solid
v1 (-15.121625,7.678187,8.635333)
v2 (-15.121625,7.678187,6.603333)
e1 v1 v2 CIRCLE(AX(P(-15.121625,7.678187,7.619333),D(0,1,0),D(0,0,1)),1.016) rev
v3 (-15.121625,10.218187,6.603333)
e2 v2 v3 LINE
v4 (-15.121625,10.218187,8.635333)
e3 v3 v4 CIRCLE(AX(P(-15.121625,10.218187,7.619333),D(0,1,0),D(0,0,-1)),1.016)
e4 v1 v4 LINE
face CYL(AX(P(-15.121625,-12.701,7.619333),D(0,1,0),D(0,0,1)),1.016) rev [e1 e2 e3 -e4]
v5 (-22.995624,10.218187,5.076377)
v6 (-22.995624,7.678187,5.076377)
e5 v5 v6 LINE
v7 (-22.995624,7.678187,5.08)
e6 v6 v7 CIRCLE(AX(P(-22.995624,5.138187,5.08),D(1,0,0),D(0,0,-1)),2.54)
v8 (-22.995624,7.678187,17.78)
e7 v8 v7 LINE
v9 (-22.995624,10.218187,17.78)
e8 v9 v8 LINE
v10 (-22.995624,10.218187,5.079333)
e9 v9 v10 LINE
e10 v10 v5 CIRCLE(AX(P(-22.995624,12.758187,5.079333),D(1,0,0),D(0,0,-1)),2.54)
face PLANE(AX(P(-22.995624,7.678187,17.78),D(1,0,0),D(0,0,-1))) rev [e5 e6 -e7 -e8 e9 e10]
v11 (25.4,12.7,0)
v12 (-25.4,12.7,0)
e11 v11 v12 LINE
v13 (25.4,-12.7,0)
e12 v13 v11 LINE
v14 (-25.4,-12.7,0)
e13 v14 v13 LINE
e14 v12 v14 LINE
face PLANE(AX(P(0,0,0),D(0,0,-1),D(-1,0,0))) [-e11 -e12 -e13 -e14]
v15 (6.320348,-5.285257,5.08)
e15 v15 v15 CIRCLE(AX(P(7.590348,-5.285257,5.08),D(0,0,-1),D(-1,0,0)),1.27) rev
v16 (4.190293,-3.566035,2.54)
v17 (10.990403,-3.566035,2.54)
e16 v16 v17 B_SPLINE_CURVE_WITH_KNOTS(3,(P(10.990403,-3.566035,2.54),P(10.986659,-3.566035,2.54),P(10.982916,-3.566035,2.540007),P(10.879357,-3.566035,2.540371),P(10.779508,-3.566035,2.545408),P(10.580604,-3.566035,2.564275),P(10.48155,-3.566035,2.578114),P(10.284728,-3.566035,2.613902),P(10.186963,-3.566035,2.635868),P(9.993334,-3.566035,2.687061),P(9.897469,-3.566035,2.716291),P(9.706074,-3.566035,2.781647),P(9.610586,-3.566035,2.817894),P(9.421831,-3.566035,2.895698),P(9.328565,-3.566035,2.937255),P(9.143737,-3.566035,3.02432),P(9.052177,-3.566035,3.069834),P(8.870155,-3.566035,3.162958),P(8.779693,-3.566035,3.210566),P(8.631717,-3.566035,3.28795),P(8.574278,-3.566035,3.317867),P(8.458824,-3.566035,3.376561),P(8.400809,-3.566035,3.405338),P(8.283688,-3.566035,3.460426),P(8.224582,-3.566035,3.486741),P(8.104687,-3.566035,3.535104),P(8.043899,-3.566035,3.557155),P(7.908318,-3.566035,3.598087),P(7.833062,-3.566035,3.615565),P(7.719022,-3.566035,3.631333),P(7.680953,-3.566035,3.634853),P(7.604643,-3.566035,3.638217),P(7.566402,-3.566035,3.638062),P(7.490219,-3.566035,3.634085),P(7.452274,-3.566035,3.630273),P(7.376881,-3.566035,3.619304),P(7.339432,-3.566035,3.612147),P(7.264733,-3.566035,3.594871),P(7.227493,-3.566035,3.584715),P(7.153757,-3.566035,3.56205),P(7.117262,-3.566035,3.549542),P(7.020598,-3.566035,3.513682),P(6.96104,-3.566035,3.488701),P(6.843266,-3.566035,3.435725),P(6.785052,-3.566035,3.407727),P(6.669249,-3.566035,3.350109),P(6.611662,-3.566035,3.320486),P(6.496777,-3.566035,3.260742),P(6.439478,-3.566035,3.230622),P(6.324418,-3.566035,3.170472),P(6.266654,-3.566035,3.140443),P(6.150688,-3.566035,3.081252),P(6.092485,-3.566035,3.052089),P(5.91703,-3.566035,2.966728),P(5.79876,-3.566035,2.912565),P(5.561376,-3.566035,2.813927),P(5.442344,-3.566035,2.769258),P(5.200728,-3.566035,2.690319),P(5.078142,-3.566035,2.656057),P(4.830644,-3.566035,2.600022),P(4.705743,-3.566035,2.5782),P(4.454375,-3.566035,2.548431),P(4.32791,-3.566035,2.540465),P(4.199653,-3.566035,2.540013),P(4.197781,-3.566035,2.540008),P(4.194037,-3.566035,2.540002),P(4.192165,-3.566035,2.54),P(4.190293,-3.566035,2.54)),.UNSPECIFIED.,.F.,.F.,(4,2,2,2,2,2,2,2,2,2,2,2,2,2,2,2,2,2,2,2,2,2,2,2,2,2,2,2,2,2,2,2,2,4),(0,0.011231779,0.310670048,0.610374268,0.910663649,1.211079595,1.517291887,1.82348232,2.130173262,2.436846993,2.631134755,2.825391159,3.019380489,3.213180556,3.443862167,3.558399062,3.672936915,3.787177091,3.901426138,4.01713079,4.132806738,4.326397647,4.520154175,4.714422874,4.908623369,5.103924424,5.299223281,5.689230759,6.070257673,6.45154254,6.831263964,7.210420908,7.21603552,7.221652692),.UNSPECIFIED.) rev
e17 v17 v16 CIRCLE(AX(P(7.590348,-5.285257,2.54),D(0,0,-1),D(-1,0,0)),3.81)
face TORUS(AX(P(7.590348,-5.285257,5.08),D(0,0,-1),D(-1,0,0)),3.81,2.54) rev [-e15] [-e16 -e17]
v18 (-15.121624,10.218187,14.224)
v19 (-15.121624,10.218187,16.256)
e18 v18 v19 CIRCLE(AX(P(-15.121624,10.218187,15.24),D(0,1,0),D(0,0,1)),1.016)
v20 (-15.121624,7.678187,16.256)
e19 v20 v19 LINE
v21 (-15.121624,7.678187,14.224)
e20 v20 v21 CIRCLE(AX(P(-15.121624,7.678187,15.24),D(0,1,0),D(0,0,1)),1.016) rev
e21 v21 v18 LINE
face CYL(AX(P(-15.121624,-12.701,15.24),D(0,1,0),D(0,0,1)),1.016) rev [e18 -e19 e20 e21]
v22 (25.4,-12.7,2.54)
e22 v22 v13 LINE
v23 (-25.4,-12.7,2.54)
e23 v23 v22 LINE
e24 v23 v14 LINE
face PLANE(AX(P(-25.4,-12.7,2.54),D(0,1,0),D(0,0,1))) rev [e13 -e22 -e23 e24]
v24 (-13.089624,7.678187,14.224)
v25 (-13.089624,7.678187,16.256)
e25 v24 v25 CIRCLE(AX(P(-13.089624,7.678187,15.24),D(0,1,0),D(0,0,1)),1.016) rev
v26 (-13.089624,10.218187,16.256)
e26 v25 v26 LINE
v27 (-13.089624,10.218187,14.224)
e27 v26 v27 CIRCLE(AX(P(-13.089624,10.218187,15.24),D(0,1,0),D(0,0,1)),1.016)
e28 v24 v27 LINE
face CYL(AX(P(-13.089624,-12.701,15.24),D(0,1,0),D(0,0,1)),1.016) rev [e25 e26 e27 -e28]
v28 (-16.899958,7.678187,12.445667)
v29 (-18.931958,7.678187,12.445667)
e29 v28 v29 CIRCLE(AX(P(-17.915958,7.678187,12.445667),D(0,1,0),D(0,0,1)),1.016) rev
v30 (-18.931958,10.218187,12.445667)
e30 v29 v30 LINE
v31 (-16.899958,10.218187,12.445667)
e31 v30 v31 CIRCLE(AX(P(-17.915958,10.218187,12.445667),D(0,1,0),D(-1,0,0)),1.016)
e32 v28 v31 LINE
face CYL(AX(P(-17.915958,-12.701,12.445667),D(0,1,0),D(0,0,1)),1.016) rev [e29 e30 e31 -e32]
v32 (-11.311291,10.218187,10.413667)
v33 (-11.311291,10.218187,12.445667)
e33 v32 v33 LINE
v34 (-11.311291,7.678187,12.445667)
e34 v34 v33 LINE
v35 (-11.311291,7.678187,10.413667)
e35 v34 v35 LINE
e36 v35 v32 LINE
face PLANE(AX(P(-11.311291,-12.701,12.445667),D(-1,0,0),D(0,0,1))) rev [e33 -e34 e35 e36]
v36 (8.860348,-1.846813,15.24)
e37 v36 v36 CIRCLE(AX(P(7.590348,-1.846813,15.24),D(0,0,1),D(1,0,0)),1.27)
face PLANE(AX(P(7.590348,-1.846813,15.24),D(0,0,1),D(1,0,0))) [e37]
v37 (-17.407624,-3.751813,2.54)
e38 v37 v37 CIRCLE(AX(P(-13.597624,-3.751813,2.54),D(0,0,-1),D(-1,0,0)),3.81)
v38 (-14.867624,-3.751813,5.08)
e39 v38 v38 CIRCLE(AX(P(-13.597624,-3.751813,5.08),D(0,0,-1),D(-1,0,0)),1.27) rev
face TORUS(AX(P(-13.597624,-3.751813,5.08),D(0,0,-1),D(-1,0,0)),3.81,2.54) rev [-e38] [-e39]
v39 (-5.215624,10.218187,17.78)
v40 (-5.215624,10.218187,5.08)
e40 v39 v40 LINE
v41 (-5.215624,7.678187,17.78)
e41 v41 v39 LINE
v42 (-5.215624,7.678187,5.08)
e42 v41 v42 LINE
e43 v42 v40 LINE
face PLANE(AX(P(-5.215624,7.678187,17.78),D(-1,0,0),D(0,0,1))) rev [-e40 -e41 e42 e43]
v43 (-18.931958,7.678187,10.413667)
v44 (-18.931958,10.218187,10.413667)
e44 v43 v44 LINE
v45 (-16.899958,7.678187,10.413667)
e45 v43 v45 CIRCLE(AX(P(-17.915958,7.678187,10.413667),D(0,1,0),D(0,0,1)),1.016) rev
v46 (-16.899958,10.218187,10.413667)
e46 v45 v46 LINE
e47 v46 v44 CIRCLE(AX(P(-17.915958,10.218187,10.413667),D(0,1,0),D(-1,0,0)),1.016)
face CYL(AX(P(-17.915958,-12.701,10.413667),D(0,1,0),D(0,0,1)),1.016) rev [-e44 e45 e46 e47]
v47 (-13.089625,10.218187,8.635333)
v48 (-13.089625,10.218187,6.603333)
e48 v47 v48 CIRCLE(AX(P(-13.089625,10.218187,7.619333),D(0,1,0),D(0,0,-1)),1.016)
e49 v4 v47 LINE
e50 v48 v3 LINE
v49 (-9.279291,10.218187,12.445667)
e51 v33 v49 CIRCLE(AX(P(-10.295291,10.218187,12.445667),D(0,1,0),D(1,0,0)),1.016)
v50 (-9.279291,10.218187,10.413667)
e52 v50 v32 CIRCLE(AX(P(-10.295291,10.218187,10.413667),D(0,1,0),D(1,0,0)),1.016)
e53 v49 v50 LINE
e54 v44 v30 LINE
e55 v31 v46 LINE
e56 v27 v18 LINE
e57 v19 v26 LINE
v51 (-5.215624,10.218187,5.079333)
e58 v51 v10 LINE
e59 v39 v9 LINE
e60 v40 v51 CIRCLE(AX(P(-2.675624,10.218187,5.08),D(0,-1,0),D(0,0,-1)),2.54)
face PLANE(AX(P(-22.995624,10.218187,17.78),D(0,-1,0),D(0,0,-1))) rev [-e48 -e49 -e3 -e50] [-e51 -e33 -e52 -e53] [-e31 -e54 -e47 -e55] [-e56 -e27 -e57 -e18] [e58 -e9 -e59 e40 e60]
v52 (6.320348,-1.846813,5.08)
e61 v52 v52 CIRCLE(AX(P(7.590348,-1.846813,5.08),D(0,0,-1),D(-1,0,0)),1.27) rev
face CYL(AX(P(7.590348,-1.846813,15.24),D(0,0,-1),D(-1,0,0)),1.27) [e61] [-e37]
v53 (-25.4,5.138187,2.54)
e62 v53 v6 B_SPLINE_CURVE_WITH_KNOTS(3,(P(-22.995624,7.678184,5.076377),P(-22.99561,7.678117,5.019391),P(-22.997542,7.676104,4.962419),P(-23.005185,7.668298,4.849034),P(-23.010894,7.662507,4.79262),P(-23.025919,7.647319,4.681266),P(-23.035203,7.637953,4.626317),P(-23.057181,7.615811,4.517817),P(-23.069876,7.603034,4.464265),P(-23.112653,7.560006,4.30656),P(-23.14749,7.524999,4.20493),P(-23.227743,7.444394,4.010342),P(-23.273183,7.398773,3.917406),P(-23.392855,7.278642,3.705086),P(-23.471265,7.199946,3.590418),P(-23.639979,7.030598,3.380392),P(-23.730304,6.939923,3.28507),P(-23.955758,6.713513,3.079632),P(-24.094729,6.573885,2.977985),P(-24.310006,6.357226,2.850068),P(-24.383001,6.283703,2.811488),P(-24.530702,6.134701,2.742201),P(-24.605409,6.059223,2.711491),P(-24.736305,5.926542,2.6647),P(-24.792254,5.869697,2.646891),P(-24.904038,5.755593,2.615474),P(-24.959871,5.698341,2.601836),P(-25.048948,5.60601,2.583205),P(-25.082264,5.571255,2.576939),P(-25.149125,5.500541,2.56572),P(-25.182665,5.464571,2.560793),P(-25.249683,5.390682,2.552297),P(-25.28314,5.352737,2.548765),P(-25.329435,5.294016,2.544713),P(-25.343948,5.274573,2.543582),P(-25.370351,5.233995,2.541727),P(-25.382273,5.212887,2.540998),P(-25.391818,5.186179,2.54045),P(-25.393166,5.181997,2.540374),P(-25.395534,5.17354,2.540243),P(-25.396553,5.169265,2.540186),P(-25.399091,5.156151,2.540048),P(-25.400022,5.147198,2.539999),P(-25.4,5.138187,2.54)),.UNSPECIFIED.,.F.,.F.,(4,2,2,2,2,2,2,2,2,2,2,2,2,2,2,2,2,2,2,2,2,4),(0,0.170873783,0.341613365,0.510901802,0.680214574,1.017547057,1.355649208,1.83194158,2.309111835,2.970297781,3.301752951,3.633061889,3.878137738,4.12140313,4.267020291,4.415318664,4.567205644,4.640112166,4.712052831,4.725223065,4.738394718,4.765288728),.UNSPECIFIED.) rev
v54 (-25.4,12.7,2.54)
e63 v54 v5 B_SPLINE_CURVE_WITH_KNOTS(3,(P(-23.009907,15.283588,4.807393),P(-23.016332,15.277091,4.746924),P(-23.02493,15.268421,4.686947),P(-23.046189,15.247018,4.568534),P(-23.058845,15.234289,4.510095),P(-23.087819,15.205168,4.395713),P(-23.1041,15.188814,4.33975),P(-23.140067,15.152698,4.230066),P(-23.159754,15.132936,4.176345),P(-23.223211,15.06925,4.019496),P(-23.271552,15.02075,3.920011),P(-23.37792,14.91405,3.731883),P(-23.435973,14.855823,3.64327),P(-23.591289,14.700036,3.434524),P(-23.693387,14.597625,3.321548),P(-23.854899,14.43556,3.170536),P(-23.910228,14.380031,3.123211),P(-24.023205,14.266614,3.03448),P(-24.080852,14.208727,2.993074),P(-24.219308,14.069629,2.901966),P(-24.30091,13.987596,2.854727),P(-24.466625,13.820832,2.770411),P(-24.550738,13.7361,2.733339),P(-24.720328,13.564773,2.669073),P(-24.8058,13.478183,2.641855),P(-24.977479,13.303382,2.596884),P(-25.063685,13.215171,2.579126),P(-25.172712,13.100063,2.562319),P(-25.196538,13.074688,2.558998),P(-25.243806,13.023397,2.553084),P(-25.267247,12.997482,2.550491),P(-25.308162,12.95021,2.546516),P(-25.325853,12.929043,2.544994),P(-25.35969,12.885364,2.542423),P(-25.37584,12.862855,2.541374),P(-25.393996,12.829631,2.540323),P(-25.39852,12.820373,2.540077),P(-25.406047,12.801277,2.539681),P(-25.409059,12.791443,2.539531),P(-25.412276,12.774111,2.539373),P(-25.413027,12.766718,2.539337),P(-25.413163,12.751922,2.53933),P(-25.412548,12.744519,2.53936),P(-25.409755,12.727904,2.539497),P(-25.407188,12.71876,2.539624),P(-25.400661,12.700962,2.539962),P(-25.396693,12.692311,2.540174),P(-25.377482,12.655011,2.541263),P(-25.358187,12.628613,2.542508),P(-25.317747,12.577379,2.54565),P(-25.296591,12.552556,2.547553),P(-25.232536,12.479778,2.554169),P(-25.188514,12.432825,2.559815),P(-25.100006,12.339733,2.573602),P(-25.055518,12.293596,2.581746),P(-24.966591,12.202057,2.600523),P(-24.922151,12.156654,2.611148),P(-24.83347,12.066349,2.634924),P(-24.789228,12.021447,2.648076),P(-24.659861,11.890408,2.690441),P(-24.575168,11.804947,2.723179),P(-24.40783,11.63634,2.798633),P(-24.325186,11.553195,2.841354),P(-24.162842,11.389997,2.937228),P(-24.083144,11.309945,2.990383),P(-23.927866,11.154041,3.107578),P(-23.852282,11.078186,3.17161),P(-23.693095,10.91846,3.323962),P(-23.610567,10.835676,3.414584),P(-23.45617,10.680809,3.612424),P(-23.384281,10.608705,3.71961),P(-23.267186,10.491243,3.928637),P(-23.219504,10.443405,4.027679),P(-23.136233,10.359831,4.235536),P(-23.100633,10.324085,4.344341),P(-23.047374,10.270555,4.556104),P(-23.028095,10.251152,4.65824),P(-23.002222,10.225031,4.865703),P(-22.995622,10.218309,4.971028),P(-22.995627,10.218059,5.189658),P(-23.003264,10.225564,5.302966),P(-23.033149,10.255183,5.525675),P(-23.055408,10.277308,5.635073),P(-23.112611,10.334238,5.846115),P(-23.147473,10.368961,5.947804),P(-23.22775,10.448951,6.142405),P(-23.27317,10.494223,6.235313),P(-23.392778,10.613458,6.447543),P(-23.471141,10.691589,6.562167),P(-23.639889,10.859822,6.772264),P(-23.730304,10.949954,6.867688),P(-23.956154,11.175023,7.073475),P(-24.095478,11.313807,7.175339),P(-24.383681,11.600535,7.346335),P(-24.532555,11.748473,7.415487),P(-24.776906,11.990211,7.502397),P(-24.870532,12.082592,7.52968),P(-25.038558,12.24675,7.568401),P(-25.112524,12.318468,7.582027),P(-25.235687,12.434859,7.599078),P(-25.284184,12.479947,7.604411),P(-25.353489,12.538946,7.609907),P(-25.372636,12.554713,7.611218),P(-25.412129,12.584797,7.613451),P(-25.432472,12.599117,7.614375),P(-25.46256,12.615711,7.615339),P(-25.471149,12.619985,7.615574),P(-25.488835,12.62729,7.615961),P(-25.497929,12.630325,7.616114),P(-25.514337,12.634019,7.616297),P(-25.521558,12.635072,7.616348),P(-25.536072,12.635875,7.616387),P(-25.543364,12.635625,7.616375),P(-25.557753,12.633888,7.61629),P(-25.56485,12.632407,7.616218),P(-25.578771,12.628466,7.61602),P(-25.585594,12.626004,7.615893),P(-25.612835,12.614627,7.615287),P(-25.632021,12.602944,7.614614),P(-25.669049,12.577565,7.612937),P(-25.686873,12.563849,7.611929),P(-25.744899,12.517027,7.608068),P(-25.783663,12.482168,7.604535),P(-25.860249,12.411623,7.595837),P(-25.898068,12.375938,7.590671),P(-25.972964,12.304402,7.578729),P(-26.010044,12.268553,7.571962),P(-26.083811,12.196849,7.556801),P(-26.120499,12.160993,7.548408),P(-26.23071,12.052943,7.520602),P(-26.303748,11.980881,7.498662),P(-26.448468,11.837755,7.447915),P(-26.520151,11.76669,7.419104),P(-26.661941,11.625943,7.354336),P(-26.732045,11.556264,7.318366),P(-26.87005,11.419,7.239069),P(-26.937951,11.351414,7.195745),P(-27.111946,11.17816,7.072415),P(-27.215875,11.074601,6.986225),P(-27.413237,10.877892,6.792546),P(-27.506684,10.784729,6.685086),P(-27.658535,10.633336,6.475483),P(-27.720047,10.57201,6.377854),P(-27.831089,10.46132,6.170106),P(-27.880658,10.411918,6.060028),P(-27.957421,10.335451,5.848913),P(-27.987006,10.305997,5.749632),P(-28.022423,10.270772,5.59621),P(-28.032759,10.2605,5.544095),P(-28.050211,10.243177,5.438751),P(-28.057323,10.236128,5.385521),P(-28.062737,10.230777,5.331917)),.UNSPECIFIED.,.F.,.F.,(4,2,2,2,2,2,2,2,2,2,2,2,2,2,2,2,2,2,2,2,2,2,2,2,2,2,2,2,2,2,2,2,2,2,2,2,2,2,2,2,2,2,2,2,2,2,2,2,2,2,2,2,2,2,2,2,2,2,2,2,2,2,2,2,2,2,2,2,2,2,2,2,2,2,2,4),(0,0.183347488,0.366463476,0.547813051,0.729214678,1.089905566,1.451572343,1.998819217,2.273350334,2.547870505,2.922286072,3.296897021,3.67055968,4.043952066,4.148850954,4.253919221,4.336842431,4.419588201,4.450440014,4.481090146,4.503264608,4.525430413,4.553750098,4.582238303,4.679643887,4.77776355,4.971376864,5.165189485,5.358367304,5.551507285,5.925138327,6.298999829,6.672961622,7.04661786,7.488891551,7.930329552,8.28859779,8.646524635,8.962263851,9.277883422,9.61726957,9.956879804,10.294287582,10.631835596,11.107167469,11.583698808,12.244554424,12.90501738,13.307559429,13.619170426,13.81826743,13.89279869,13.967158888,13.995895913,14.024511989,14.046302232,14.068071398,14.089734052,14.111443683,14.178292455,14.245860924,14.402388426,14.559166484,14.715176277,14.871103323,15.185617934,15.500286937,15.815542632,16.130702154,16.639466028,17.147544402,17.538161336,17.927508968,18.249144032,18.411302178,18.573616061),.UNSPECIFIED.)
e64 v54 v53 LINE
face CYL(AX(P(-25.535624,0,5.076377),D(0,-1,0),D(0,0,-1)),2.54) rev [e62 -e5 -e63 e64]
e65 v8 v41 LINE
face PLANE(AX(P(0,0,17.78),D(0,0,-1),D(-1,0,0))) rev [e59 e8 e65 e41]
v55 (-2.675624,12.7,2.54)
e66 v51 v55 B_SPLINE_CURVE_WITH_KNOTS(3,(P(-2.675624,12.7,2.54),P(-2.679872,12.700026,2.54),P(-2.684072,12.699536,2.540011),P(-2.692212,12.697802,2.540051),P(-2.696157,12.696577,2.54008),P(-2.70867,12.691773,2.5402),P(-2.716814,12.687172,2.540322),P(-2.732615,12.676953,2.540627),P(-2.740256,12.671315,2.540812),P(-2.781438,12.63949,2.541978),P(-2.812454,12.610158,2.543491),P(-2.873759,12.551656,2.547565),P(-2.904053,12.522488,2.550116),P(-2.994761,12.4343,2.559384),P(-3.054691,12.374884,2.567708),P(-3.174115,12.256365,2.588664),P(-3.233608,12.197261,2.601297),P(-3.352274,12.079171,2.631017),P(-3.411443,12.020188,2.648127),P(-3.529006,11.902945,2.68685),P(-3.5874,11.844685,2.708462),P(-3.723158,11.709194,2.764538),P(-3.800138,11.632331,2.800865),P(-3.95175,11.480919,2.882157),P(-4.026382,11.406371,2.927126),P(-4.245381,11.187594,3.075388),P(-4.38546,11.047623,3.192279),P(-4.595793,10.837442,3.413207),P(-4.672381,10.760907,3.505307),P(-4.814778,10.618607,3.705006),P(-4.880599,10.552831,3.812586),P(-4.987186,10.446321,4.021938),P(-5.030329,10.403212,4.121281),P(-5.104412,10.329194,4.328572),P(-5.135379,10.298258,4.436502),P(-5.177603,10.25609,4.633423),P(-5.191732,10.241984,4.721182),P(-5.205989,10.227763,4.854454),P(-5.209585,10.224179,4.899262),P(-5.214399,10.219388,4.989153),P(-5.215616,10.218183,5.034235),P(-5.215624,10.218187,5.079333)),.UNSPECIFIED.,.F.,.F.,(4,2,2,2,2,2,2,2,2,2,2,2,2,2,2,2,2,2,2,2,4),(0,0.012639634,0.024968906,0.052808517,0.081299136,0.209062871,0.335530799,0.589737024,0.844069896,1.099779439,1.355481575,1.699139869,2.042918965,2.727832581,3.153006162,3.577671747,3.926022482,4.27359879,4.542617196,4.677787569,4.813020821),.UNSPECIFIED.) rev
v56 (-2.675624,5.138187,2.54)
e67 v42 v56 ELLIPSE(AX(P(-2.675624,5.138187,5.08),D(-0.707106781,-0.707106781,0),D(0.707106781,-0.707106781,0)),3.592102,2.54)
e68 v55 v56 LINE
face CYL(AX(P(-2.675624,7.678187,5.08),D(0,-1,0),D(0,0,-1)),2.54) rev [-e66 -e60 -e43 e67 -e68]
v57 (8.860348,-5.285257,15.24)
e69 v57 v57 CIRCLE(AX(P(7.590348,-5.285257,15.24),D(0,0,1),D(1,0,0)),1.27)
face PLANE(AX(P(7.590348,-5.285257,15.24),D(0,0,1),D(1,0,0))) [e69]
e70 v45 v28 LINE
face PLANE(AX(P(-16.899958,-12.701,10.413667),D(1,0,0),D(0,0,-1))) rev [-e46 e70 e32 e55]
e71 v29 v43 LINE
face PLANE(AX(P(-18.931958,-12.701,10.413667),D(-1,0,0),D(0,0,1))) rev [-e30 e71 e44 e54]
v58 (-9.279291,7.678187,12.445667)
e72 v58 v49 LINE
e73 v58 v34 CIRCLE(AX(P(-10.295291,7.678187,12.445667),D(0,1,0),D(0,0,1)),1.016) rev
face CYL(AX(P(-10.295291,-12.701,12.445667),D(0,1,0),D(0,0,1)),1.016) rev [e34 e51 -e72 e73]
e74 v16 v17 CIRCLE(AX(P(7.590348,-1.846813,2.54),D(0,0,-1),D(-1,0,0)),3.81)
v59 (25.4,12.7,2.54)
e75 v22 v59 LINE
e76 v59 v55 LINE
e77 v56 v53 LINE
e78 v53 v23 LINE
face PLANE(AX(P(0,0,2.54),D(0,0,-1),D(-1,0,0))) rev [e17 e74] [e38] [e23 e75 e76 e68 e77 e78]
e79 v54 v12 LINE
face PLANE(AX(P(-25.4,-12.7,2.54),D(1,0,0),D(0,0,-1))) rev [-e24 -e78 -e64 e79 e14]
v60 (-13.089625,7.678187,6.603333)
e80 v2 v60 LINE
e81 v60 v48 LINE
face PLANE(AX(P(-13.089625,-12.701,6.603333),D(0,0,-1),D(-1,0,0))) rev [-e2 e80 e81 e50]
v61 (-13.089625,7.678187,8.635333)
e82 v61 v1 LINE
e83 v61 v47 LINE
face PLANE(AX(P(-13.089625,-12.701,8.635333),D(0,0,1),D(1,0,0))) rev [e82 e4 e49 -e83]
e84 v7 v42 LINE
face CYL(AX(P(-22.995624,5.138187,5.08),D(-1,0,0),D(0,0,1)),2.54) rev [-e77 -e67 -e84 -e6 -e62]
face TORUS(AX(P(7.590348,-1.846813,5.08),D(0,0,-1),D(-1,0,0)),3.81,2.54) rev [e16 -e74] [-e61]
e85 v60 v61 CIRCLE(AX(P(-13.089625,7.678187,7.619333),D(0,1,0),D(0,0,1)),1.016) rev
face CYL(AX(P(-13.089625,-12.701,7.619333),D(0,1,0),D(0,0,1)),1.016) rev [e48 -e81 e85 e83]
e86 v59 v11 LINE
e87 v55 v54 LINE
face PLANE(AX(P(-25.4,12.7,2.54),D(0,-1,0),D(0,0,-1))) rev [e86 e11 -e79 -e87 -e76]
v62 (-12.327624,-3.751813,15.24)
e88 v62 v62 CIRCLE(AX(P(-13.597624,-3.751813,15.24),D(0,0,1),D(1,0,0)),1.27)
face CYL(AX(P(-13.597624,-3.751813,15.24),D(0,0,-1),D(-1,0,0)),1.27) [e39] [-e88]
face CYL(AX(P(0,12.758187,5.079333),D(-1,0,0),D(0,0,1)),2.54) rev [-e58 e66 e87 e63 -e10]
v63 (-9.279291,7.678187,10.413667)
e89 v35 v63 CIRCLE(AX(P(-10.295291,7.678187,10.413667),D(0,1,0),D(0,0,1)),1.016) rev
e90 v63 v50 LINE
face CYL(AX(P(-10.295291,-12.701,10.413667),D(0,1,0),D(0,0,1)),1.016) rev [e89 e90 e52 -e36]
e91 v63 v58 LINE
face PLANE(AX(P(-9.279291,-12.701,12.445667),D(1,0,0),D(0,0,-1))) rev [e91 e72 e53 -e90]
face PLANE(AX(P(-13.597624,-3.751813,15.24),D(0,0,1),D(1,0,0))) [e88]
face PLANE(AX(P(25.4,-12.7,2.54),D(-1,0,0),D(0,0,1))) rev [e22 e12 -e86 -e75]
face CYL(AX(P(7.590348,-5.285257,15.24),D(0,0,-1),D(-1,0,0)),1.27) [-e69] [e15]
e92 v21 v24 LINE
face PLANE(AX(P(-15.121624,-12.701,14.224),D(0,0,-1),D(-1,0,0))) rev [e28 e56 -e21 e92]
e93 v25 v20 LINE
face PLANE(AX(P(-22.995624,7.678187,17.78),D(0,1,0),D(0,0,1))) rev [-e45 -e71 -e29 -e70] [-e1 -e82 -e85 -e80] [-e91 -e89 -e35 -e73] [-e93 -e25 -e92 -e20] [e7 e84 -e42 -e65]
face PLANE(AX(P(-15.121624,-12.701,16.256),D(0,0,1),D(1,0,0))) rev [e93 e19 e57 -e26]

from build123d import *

# Parameters (mm, degrees)
SKETCH1_W                 = 50.8
SKETCH1_H                 = 25.4
BASE_DEPTH                = 2.54
SKETCH2_R                 = 1.27
GUIDEPOSTS_DEPTH          = 12.7
SKETCH3_W                 = 17.78
SKETCH3_H                 = 2.54
BUTTON_HOLDER_DEPTH       = 15.24
ROUND_ON_BUTTON_HOLDER_R  = 2.54
ONE_BUTTON_LEG_HOLE_REACH = 40.556
BUTTON_LEG_HOLES_COUNT    = 4


with BuildPart() as part:
    # Sketch1 → base (new body)
    with BuildSketch(Plane.XY):
        Rectangle(SKETCH1_W, SKETCH1_H)
    extrude(amount=BASE_DEPTH)

    # Sketch2 → guideposts (add)
    with BuildSketch(Plane.XY.offset(2.54)):
        with Locations(Location((7.590347968, -1.846813132, 0), (0, 0, 180))):
            Circle(SKETCH2_R)
        with Locations(Location((7.590347968, -5.285256746, 0), (0, 0, 180))):
            Circle(SKETCH2_R)
        with Locations(Location((-13.597624432, -3.751813132, 0), (0, 0, 180))):
            Circle(SKETCH2_R)
    extrude(amount=GUIDEPOSTS_DEPTH)

    # Sketch3 → button holder (add)
    with BuildSketch(Plane.XY.offset(2.54)):
        with Locations((-14.105624432, 8.948186868)):
            Rectangle(SKETCH3_W, SKETCH3_H)
    extrude(amount=BUTTON_HOLDER_DEPTH)

    # round on button holder
    # the kernel refuses this fillet: 2.54 mm, written as the material it adds along each edge
    with BuildSketch(Plane(origin=(7.590347968, -1.846813132, 2.54), x_dir=(-1, 0, 0), z_dir=(0, 1, 0))) as round_on_button_holder_piece_1:
        with BuildLine():
            CenterArc((1.27 + ROUND_ON_BUTTON_HOLDER_R, ROUND_ON_BUTTON_HOLDER_R), ROUND_ON_BUTTON_HOLDER_R, 180, 90)
            Line((1.27, ROUND_ON_BUTTON_HOLDER_R), (1.27, 0))
            Line((1.27, 0), (1.27 + ROUND_ON_BUTTON_HOLDER_R, 0))
        make_face()
    round_on_button_holder_piece_1_solid = revolve(axis=Axis((7.590347968, -1.846813132, 2.54), (0, 0, 1)), mode=Mode.PRIVATE)
    with BuildSketch(Plane(origin=(7.590347968, -5.285256746, 2.54), x_dir=(-1, 0, 0), z_dir=(0, 1, 0))) as round_on_button_holder_piece_2:
        with BuildLine():
            CenterArc((1.27 + ROUND_ON_BUTTON_HOLDER_R, ROUND_ON_BUTTON_HOLDER_R), ROUND_ON_BUTTON_HOLDER_R, 180, 90)
            Line((1.27, ROUND_ON_BUTTON_HOLDER_R), (1.27, 0))
            Line((1.27, 0), (1.27 + ROUND_ON_BUTTON_HOLDER_R, 0))
        make_face()
    round_on_button_holder_piece_2_solid = revolve(axis=Axis((7.590347968, -5.285256746, 2.54), (0, 0, 1)), mode=Mode.PRIVATE)
    with BuildSketch(Plane(origin=(-13.597624432, -3.751813132, 2.54), x_dir=(-1, 0, 0), z_dir=(0, 1, 0))) as round_on_button_holder_piece_3:
        with BuildLine():
            CenterArc((1.27 + ROUND_ON_BUTTON_HOLDER_R, ROUND_ON_BUTTON_HOLDER_R), ROUND_ON_BUTTON_HOLDER_R, 180, 90)
            Line((1.27, ROUND_ON_BUTTON_HOLDER_R), (1.27, 0))
            Line((1.27, 0), (1.27 + ROUND_ON_BUTTON_HOLDER_R, 0))
        make_face()
    round_on_button_holder_piece_3_solid = revolve(axis=Axis((-13.597624432, -3.751813132, 2.54), (0, 0, 1)), mode=Mode.PRIVATE)
    with BuildSketch(Plane(origin=(-5.215624432, 7.678186868, 2.54), x_dir=(1, 0, 0), z_dir=(0, 1, 0))) as round_on_button_holder_piece_4:
        with BuildLine():
            CenterArc((ROUND_ON_BUTTON_HOLDER_R, -ROUND_ON_BUTTON_HOLDER_R), ROUND_ON_BUTTON_HOLDER_R, 90, 90)
            Line((0, -ROUND_ON_BUTTON_HOLDER_R), (0, 0))
            Line((0, 0), (ROUND_ON_BUTTON_HOLDER_R, 0))
        make_face()
    round_on_button_holder_piece_4_solid = extrude(amount=2.54, mode=Mode.PRIVATE)
    with BuildSketch(Plane(origin=(-5.215624432, 10.218186868, 2.54), x_dir=(0, 1, 0), z_dir=(-1, 0, 0))) as round_on_button_holder_piece_5_section:
        with BuildLine():
            CenterArc((ROUND_ON_BUTTON_HOLDER_R, -ROUND_ON_BUTTON_HOLDER_R), ROUND_ON_BUTTON_HOLDER_R, 90, 90)
            Line((0, -ROUND_ON_BUTTON_HOLDER_R), (0, 0))
            Line((0, 0), (ROUND_ON_BUTTON_HOLDER_R, 0))
        make_face()
    round_on_button_holder_piece_5 = extrude(amount=17.78, mode=Mode.PRIVATE)
    round_on_button_holder_piece_5 = split(round_on_button_holder_piece_5, bisect_by=Plane(origin=(-5.215624432, 12.7, 2.54), z_dir=(0, -1, 0)), keep=Keep.TOP, mode=Mode.PRIVATE)
    with BuildSketch(Plane(origin=(-22.995624432, 10.218186868, 2.54), x_dir=(-1, 0, 0), z_dir=(0, -1, 0))) as round_on_button_holder_piece_6:
        with BuildLine():
            CenterArc((2.54, -2.536376552), ROUND_ON_BUTTON_HOLDER_R, 93.060789284, 86.939210716)
            Line((0, -2.536376552), (0, 0))
            Line((0, 0), (2.404375568, 0))
        make_face()
    round_on_button_holder_piece_6_solid = extrude(amount=2.54, mode=Mode.PRIVATE)
    with BuildSketch(Plane(origin=(-22.995624432, 7.678186868, 2.54), x_dir=(0, -1, 0), z_dir=(1, 0, 0))) as round_on_button_holder_piece_7:
        with BuildLine():
            CenterArc((ROUND_ON_BUTTON_HOLDER_R, -ROUND_ON_BUTTON_HOLDER_R), ROUND_ON_BUTTON_HOLDER_R, 90, 90)
            Line((0, -ROUND_ON_BUTTON_HOLDER_R), (0, 0))
            Line((0, 0), (ROUND_ON_BUTTON_HOLDER_R, 0))
        make_face()
    round_on_button_holder_piece_7_solid = extrude(amount=17.78, mode=Mode.PRIVATE)
    with BuildSketch(Plane(origin=(-22.995624432, 7.678186868, 2.54), x_dir=(0, -1, 0), z_dir=(1, 0, 0))) as round_on_button_holder_piece_8a_section:
        with BuildLine():
            CenterArc((ROUND_ON_BUTTON_HOLDER_R, -ROUND_ON_BUTTON_HOLDER_R), ROUND_ON_BUTTON_HOLDER_R, 90, 90)
            Line((0, -ROUND_ON_BUTTON_HOLDER_R), (0, 0))
            Line((0, 0), (ROUND_ON_BUTTON_HOLDER_R, 0))
        make_face()
    round_on_button_holder_piece_8a = extrude(amount=24.13, mode=Mode.PRIVATE)
    round_on_button_holder_piece_8a = split(round_on_button_holder_piece_8a, bisect_by=Plane(origin=(-5.215624432, 7.678186868, 2.54), z_dir=(1, 0, 0)), keep=Keep.TOP, mode=Mode.PRIVATE)
    with BuildSketch(Plane(origin=(-5.215624432, 1.328186868, 2.54), x_dir=(1, 0, 0), z_dir=(0, 1, 0))) as round_on_button_holder_piece_8b_section:
        with BuildLine():
            CenterArc((ROUND_ON_BUTTON_HOLDER_R, -ROUND_ON_BUTTON_HOLDER_R), ROUND_ON_BUTTON_HOLDER_R, 90, 90)
            Line((0, -ROUND_ON_BUTTON_HOLDER_R), (0, 0))
            Line((0, 0), (ROUND_ON_BUTTON_HOLDER_R, 0))
        make_face()
    round_on_button_holder_piece_8b = extrude(amount=8.89, mode=Mode.PRIVATE)
    round_on_button_holder_piece_8b = split(round_on_button_holder_piece_8b, bisect_by=Plane(origin=(-5.215624432, 7.678186868, 2.54), z_dir=(0, -1, 0)), keep=Keep.TOP, mode=Mode.PRIVATE)
    round_on_button_holder_piece_8 = round_on_button_holder_piece_8a & round_on_button_holder_piece_8b
    with BuildSketch(Plane(origin=(-5.215624432, 7.678186868, 2.54), x_dir=(1, 0, 0), z_dir=(0, 1, 0))) as round_on_button_holder_piece_9a_section:
        with BuildLine():
            CenterArc((ROUND_ON_BUTTON_HOLDER_R, -ROUND_ON_BUTTON_HOLDER_R), ROUND_ON_BUTTON_HOLDER_R, 90, 90)
            Line((0, -ROUND_ON_BUTTON_HOLDER_R), (0, 0))
            Line((0, 0), (ROUND_ON_BUTTON_HOLDER_R, 0))
        make_face()
    round_on_button_holder_piece_9a = extrude(amount=8.89, mode=Mode.PRIVATE)
    round_on_button_holder_piece_9a = split(round_on_button_holder_piece_9a, bisect_by=Plane(origin=(-5.215624432, 12.7, 2.54), z_dir=(0, -1, 0)), keep=Keep.TOP, mode=Mode.PRIVATE)
    round_on_button_holder_piece_9a = split(round_on_button_holder_piece_9a, bisect_by=Plane(origin=(-5.215624432, 10.218186868, 2.54), z_dir=(0, 1, 0)), keep=Keep.TOP, mode=Mode.PRIVATE)
    with BuildSketch(Plane(origin=(1.134375568, 10.218186868, 2.54), x_dir=(0, 1, 0), z_dir=(-1, 0, 0))) as round_on_button_holder_piece_9b_section:
        with BuildLine():
            CenterArc((ROUND_ON_BUTTON_HOLDER_R, -ROUND_ON_BUTTON_HOLDER_R), ROUND_ON_BUTTON_HOLDER_R, 90, 90)
            Line((0, -ROUND_ON_BUTTON_HOLDER_R), (0, 0))
            Line((0, 0), (ROUND_ON_BUTTON_HOLDER_R, 0))
        make_face()
    round_on_button_holder_piece_9b = extrude(amount=24.13, mode=Mode.PRIVATE)
    round_on_button_holder_piece_9b = split(round_on_button_holder_piece_9b, bisect_by=Plane(origin=(-5.215624432, 10.218186868, 2.54), z_dir=(1, 0, 0)), keep=Keep.TOP, mode=Mode.PRIVATE)
    round_on_button_holder_piece_9 = round_on_button_holder_piece_9a & round_on_button_holder_piece_9b
    with BuildSketch(Plane(origin=(-5.215624432, 10.218186868, 2.54), x_dir=(0, 1, 0), z_dir=(-1, 0, 0))) as round_on_button_holder_piece_10a_section:
        with BuildLine():
            CenterArc((ROUND_ON_BUTTON_HOLDER_R, -ROUND_ON_BUTTON_HOLDER_R), ROUND_ON_BUTTON_HOLDER_R, 90, 90)
            Line((0, -ROUND_ON_BUTTON_HOLDER_R), (0, 0))
            Line((0, 0), (ROUND_ON_BUTTON_HOLDER_R, 0))
        make_face()
    round_on_button_holder_piece_10a = extrude(amount=24.13, mode=Mode.PRIVATE)
    round_on_button_holder_piece_10a = split(round_on_button_holder_piece_10a, bisect_by=Plane(origin=(-25.4, 10.218186868, 2.54), z_dir=(1, 0, 0)), keep=Keep.TOP, mode=Mode.PRIVATE)
    round_on_button_holder_piece_10a = split(round_on_button_holder_piece_10a, bisect_by=Plane(origin=(-22.995624432, 10.218186868, 2.54), z_dir=(-1, 0, 0)), keep=Keep.TOP, mode=Mode.PRIVATE)
    with BuildSketch(Plane(origin=(-22.995624432, 16.559128248, 2.54), x_dir=(-1, 0, 0), z_dir=(0, -1, 0))) as round_on_button_holder_piece_10b_section:
        with BuildLine():
            CenterArc((2.54, -2.536376552), ROUND_ON_BUTTON_HOLDER_R, 93.060789284, 86.939210716)
            Line((0, -2.536376552), (0, 0))
            Line((0, 0), (2.404375568, 0))
        make_face()
    round_on_button_holder_piece_10b = extrude(amount=8.88094138, mode=Mode.PRIVATE)
    round_on_button_holder_piece_10b = split(round_on_button_holder_piece_10b, bisect_by=Plane(origin=(-22.995624432, 12.7, 2.54), z_dir=(0, -1, 0)), keep=Keep.TOP, mode=Mode.PRIVATE)
    round_on_button_holder_piece_10b = split(round_on_button_holder_piece_10b, bisect_by=Plane(origin=(-22.995624432, 10.218186868, 2.54), z_dir=(0, 1, 0)), keep=Keep.TOP, mode=Mode.PRIVATE)
    round_on_button_holder_piece_10 = round_on_button_holder_piece_10a & round_on_button_holder_piece_10b
    with BuildSketch(Plane(origin=(-29.345624432, 7.678186868, 2.54), x_dir=(0, -1, 0), z_dir=(1, 0, 0))) as round_on_button_holder_piece_11a_section:
        with BuildLine():
            CenterArc((ROUND_ON_BUTTON_HOLDER_R, -ROUND_ON_BUTTON_HOLDER_R), ROUND_ON_BUTTON_HOLDER_R, 90, 90)
            Line((0, -ROUND_ON_BUTTON_HOLDER_R), (0, 0))
            Line((0, 0), (ROUND_ON_BUTTON_HOLDER_R, 0))
        make_face()
    round_on_button_holder_piece_11a = extrude(amount=24.13, mode=Mode.PRIVATE)
    round_on_button_holder_piece_11a = split(round_on_button_holder_piece_11a, bisect_by=Plane(origin=(-25.4, 7.678186868, 2.54), z_dir=(1, 0, 0)), keep=Keep.TOP, mode=Mode.PRIVATE)
    round_on_button_holder_piece_11a = split(round_on_button_holder_piece_11a, bisect_by=Plane(origin=(-22.995624432, 7.678186868, 2.54), z_dir=(-1, 0, 0)), keep=Keep.TOP, mode=Mode.PRIVATE)
    with BuildSketch(Plane(origin=(-22.995624432, 10.218186868, 2.54), x_dir=(-1, 0, 0), z_dir=(0, -1, 0))) as round_on_button_holder_piece_11b_section:
        with BuildLine():
            CenterArc((2.54, -2.536376552), ROUND_ON_BUTTON_HOLDER_R, 93.060789284, 86.939210716)
            Line((0, -2.536376552), (0, 0))
            Line((0, 0), (2.404375568, 0))
        make_face()
    round_on_button_holder_piece_11b = extrude(amount=8.88094138, mode=Mode.PRIVATE)
    round_on_button_holder_piece_11b = split(round_on_button_holder_piece_11b, bisect_by=Plane(origin=(-22.995624432, 7.678186868, 2.54), z_dir=(0, -1, 0)), keep=Keep.TOP, mode=Mode.PRIVATE)
    round_on_button_holder_piece_11 = round_on_button_holder_piece_11a & round_on_button_holder_piece_11b
    add([round_on_button_holder_piece_1_solid, round_on_button_holder_piece_2_solid, round_on_button_holder_piece_3_solid, round_on_button_holder_piece_4_solid, round_on_button_holder_piece_5, round_on_button_holder_piece_6_solid, round_on_button_holder_piece_7_solid, round_on_button_holder_piece_8, round_on_button_holder_piece_9, round_on_button_holder_piece_10, round_on_button_holder_piece_11])

    # Sketch4 → one button leg hole (cut, up to next)
    with BuildSketch(Plane(origin=(0, 10.218186868, 0), x_dir=(1, 0, 0), z_dir=(0, 1, 0)), mode=Mode.PRIVATE) as one_button_leg_hole_sk1:
        with BuildLine():
            Line((-15.121624432, -14.224), (-13.089624432, -14.224))
            ThreePointArc((-13.089624432, -14.224), (-12.073624432, -15.24), (-13.089624432, -16.256))
            Line((-13.089624432, -16.256), (-15.121624432, -16.256))
            ThreePointArc((-15.121624432, -16.256), (-16.137624432, -15.24), (-15.121624432, -14.224))
        make_face()
    one_button_leg_hole_tool1 = extrude(one_button_leg_hole_sk1.sketch, amount=-ONE_BUTTON_LEG_HOLE_REACH, mode=Mode.PRIVATE) & part.part
    one_button_leg_hole = one_button_leg_hole_tool1.solids().sort_by_distance((-14.105624, 10.218187, 15.24))[0]
    add(one_button_leg_hole, mode=Mode.SUBTRACT)

    # button leg holes: one button leg hole ×4 about axis
    button_leg_holes_axis = Axis((-14.105624476, 0, 11.429666717), (0, 1, 0))
    for i in range(1, BUTTON_LEG_HOLES_COUNT):
        add(one_button_leg_hole.rotate(button_leg_holes_axis, i * 360 / BUTTON_LEG_HOLES_COUNT), mode=Mode.SUBTRACT)


solid = part.part
